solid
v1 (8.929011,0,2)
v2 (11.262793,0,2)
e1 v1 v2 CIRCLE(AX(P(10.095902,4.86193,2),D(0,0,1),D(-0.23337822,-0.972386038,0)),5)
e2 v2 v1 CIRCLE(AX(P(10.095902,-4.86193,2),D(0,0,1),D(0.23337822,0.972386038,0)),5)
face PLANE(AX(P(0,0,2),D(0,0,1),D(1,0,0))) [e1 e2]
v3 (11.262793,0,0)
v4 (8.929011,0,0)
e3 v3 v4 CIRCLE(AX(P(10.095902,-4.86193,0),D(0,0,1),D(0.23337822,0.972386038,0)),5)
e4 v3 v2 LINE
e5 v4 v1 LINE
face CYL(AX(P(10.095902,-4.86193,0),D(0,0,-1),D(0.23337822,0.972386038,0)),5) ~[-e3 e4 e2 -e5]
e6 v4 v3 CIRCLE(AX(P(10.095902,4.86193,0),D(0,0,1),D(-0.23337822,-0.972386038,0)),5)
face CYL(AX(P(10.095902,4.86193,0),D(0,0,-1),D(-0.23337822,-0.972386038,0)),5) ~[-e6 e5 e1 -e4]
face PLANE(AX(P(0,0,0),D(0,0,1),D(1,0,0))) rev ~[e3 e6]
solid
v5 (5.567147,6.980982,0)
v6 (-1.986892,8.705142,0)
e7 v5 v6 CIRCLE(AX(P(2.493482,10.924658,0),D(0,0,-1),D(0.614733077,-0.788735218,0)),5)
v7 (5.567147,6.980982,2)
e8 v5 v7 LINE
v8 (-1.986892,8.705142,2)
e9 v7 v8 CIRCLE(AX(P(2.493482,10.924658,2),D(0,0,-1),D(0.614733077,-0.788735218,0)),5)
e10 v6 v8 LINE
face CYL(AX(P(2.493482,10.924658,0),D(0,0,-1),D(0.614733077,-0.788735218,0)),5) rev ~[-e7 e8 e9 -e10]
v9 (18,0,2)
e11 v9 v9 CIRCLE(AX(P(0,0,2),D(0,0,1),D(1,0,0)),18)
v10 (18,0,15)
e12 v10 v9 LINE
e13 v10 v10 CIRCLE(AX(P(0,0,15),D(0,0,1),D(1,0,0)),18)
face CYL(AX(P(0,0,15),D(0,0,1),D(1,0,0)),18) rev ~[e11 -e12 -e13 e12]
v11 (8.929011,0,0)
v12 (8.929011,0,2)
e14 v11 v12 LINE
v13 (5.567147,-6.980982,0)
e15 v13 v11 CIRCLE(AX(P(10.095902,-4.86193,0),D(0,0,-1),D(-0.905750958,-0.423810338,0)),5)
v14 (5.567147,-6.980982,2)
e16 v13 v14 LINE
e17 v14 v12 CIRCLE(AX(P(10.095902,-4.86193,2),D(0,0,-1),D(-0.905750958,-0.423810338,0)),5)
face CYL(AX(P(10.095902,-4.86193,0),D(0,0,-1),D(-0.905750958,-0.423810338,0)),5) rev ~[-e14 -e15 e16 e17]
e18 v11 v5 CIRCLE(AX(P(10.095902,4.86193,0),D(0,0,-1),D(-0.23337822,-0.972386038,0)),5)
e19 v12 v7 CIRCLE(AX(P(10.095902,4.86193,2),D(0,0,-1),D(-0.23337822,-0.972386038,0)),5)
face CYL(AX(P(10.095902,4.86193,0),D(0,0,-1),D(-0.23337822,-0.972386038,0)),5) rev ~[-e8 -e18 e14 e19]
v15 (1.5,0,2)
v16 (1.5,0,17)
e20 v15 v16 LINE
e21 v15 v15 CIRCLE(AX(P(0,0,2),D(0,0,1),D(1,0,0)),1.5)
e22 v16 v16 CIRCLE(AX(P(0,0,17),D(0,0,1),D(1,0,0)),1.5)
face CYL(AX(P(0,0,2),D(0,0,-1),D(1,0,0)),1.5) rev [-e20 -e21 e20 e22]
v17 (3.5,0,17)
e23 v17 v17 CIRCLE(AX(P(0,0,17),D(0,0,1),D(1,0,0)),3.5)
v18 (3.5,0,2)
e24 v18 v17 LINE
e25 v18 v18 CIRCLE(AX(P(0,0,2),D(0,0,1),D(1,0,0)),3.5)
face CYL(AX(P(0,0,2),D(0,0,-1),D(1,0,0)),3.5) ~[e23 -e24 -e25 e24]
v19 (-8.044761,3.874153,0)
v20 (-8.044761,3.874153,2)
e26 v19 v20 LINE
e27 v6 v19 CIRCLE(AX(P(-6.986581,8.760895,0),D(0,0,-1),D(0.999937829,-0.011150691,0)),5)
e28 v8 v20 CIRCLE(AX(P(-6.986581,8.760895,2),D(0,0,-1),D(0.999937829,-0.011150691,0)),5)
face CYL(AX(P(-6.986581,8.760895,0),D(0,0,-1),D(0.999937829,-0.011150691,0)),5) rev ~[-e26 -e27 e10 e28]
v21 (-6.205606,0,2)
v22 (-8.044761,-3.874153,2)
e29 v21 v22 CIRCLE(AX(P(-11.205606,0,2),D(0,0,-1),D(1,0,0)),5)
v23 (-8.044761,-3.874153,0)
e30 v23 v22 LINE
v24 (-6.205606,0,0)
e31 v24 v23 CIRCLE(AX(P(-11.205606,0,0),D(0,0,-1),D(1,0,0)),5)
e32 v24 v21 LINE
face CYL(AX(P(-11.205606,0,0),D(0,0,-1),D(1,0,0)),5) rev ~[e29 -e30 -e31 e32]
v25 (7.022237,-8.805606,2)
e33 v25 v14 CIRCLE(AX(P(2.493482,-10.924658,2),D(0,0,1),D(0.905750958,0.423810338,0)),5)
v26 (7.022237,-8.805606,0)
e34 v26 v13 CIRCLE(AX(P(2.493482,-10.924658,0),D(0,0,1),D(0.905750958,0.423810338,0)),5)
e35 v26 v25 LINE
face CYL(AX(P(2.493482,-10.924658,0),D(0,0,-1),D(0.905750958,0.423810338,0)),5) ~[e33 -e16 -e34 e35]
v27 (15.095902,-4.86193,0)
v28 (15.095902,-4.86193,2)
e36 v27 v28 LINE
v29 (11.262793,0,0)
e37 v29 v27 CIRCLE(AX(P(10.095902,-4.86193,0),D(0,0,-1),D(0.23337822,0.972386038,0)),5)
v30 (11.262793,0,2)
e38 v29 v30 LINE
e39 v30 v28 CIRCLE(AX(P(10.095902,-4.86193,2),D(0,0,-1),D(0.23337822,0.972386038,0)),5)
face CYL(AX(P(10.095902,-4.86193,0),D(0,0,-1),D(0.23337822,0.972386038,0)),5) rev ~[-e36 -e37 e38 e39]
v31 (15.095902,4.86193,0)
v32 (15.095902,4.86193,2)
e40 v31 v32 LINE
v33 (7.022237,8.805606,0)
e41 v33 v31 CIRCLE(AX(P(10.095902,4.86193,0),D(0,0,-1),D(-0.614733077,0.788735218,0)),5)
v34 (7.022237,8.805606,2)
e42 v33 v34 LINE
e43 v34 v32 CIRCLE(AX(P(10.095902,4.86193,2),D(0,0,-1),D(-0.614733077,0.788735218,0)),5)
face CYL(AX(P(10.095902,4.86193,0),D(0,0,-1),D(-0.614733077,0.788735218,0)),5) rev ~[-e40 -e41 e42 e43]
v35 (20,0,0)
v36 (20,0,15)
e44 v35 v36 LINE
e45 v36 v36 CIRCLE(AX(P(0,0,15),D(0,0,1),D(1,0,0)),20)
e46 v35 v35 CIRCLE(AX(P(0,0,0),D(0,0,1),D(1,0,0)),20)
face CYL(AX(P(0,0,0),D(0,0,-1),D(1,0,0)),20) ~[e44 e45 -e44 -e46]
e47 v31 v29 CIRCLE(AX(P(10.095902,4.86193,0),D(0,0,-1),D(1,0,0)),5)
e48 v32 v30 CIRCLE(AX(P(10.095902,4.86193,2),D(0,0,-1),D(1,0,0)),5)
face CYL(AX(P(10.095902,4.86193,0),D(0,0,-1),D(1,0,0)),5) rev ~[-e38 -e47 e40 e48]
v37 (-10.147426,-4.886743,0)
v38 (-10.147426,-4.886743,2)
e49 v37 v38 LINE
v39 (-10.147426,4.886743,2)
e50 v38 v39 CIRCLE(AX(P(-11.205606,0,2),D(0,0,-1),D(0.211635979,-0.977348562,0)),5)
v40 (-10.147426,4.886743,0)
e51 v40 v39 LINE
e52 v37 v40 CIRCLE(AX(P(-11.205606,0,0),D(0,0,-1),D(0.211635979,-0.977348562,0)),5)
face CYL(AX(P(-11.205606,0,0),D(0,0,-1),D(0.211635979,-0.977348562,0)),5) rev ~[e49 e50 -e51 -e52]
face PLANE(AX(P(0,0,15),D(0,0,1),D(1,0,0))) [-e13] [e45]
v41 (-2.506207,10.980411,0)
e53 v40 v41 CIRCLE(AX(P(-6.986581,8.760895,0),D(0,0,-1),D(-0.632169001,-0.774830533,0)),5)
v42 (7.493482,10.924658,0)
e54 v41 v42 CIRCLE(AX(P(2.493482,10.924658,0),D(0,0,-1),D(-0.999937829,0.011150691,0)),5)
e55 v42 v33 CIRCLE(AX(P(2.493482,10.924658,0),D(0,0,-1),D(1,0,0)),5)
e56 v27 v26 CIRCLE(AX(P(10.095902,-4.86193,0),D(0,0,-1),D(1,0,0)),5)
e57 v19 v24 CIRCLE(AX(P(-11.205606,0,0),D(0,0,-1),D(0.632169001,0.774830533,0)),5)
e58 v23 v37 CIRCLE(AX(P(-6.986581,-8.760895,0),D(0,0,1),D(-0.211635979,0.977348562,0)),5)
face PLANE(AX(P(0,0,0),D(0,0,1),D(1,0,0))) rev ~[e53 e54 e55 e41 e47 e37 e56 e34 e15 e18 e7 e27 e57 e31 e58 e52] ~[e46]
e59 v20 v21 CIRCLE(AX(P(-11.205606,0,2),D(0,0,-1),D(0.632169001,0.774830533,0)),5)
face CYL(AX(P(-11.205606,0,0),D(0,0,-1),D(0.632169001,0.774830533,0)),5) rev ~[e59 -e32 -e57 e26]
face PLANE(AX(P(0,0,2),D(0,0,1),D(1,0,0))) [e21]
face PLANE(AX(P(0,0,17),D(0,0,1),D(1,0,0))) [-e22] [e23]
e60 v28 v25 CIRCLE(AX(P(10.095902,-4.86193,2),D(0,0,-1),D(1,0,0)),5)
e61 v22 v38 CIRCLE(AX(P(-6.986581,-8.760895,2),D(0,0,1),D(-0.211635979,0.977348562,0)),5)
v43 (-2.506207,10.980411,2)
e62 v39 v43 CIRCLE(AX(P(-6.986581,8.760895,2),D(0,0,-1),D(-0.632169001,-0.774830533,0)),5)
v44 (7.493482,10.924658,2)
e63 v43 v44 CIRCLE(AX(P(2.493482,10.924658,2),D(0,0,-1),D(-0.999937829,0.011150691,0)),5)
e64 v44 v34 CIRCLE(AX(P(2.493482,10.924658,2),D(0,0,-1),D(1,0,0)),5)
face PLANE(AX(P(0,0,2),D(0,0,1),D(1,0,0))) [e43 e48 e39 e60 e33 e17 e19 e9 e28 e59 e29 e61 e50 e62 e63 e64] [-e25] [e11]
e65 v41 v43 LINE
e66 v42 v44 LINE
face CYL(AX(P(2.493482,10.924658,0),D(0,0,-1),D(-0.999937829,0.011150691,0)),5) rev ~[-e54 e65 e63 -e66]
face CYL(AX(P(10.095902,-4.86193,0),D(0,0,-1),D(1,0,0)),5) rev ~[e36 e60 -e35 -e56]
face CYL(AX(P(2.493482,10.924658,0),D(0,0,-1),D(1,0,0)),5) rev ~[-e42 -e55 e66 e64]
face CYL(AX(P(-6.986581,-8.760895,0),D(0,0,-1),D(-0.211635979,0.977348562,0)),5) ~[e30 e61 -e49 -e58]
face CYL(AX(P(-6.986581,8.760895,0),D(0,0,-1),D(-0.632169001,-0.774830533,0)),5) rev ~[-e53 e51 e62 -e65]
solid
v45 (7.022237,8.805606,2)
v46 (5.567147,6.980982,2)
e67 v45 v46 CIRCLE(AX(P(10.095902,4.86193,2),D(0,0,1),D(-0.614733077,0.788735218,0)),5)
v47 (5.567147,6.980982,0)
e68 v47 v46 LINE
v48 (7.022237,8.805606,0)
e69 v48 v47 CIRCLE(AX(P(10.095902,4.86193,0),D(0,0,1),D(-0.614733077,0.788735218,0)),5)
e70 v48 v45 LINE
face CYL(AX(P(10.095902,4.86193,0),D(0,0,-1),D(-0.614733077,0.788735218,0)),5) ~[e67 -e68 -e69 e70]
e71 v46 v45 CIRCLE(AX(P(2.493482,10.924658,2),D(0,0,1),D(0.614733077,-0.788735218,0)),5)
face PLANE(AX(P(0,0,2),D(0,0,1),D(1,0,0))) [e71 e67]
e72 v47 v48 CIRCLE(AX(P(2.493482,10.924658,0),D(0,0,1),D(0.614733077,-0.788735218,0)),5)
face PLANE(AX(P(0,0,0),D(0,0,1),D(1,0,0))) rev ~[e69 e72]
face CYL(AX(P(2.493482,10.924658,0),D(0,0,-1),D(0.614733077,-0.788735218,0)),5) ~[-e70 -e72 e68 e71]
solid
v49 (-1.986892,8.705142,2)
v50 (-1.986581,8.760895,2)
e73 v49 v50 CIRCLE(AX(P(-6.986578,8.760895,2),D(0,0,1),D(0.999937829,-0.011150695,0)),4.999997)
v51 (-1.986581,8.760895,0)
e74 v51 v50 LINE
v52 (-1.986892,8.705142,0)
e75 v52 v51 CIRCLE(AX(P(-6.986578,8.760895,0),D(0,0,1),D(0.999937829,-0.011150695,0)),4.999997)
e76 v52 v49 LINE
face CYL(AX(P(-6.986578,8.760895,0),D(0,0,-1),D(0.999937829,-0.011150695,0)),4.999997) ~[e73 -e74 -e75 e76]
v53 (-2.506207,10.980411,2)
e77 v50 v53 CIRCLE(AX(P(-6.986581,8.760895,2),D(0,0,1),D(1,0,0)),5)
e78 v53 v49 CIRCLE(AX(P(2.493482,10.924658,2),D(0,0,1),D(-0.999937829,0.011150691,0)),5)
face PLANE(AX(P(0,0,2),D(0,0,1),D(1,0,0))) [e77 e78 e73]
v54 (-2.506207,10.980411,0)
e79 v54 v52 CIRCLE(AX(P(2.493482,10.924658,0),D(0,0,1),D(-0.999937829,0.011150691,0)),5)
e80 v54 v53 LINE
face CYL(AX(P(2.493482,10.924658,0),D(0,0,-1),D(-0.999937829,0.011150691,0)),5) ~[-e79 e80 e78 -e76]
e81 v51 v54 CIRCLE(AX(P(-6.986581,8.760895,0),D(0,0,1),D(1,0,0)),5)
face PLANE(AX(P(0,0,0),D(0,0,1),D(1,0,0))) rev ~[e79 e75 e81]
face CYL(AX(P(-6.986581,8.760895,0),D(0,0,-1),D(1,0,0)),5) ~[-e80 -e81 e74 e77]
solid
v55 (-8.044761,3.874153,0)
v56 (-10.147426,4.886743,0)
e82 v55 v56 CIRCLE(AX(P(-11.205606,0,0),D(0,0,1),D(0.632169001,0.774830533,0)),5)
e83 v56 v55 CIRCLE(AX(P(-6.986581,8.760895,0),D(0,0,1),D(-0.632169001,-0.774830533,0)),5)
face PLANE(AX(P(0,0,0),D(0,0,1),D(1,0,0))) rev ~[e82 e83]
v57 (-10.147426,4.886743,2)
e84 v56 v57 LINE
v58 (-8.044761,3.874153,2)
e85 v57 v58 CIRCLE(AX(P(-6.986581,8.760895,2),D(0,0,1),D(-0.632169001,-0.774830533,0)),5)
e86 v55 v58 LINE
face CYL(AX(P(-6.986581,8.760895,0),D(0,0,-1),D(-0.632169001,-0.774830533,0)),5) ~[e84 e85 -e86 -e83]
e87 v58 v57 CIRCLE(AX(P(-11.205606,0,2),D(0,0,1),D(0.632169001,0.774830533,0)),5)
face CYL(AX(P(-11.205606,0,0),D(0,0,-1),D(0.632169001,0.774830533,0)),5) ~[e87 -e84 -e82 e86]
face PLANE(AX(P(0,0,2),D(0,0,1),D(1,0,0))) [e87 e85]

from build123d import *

# Parameters (mm, degrees)
F0_R     = 20
F1_DEPTH = 15
F2_R     = 18
F3_DEPTH = 13
F4_R     = 3.5
F4_R_2   = 1.5
F5_DEPTH = 15
F7_DEPTH = 2


# Not quite as in the source:
# - a feature names something its author has since deleted; it is built from what else it names


with BuildPart() as f1:
    # F0 (on Top) → F1 (new body)
    with BuildSketch(Plane.XY):
        Circle(F0_R)
    extrude(amount=F1_DEPTH)

    # F2 (on face) → F3 (cut)
    with BuildSketch(Plane.XY.offset(15)):
        Circle(F2_R)
    extrude(amount=-F3_DEPTH, mode=Mode.SUBTRACT)

    # F4 (on face) → F5 (join)
    with BuildSketch(Plane.XY.offset(2)):
        Circle(F4_R)
        Circle(F4_R_2, mode=Mode.SUBTRACT)
    extrude(amount=F5_DEPTH)

    # F6 (on face) → F7 (cut)
    with BuildSketch(Plane(origin=(0, 0, 0), x_dir=(1, 0, 0), z_dir=(0, 0, -1))):
        with BuildLine():
            ThreePointArc((-8.0447609019, -3.8741526647), (-6.6887361359, -2.1442685218), (-6.2056059045, 0))
            ThreePointArc((-6.2056059045, 0), (-6.6887361359, 2.1442685218), (-8.0447609019, 3.8741526647))
            ThreePointArc((-8.0447609019, 3.8741526647), (-9.1559997007, 4.2560511367), (-10.1474260077, 4.8867428115))
            ThreePointArc((-10.1474260077, 4.8867428115), (-16.2056059045, 0), (-10.1474260077, -4.8867428115))
            ThreePointArc((-10.1474260077, -4.8867428115), (-9.1559997007, -4.2560511367), (-8.0447609019, -3.8741526647))
        make_face()
        with BuildLine():
            ThreePointArc((7.0222366791, 8.8056062773), (6.4026393038, 7.8072089599), (5.5671472783, 6.9809818809))
            ThreePointArc((5.5671472783, 6.9809818809), (5.5910577264, 2.6925114933), (8.9290109664, 0))
            ThreePointArc((8.9290109664, 0), (10.0959020659, 0.1380698111), (11.2627931654, 0))
            ThreePointArc((11.2627931654, 0), (14.0223798449, 1.7663248763), (15.0959020659, 4.8619301889))
            ThreePointArc((15.0959020659, 4.8619301889), (12.2904034974, 9.3546090632), (7.0222366791, 8.8056062773))
        make_face()
        with BuildLine():
            ThreePointArc((8.9290109664, 0), (5.5910577264, -2.6925114933), (5.5671472783, -6.9809818809))
            ThreePointArc((5.5671472783, -6.9809818809), (6.4026393038, -7.8072089599), (7.0222366791, -8.8056062773))
            ThreePointArc((7.0222366791, -8.8056062773), (12.2904034974, -9.3546090632), (15.0959020659, -4.8619301889))
            ThreePointArc((15.0959020659, -4.8619301889), (14.0223798449, -1.7663248763), (11.2627931654, 0))
            ThreePointArc((11.2627931654, 0), (10.0959020659, -0.1380698111), (8.9290109664, 0))
        make_face()
        with BuildLine():
            ThreePointArc((5.5671472783, -6.9809818809), (1.3808772216, -6.0500184083), (-1.9868918596, -8.7051420193))
            ThreePointArc((-1.9868918596, -8.7051420193), (-1.9866587193, -8.7330183145), (-1.9865810051, -8.7608954763))
            ThreePointArc((-1.9865810051, -8.7608954763), (-2.118220462, -9.9006610761), (-2.5062072541, -10.9804114261))
            ThreePointArc((-2.5062072541, -10.9804114261), (2.5213590532, -15.924580255), (7.4934818914, -10.9246579692))
            ThreePointArc((7.4934818914, -10.9246579692), (7.3742489386, -9.8392488156), (7.0222366791, -8.8056062773))
            ThreePointArc((7.0222366791, -8.8056062773), (6.1867446536, -7.9793791982), (5.5671472783, -6.9809818809))
        make_face()
        with BuildLine():
            ThreePointArc((-1.9868918596, -8.7051420193), (-3.8691319958, -4.8517380639), (-8.0447609019, -3.8741526647))
            ThreePointArc((-8.0447609019, -3.8741526647), (-9.0361872089, -4.5048443395), (-10.1474260077, -4.8867428115))
            ThreePointArc((-10.1474260077, -4.8867428115), (-10.1040300144, -12.6700528886), (-2.5062072541, -10.9804114261))
            ThreePointArc((-2.5062072541, -10.9804114261), (-2.3811576695, -9.8120532994), (-1.9868918596, -8.7051420193))
        make_face()
    extrude(amount=-F7_DEPTH, mode=Mode.SUBTRACT)


solid = f1.part
